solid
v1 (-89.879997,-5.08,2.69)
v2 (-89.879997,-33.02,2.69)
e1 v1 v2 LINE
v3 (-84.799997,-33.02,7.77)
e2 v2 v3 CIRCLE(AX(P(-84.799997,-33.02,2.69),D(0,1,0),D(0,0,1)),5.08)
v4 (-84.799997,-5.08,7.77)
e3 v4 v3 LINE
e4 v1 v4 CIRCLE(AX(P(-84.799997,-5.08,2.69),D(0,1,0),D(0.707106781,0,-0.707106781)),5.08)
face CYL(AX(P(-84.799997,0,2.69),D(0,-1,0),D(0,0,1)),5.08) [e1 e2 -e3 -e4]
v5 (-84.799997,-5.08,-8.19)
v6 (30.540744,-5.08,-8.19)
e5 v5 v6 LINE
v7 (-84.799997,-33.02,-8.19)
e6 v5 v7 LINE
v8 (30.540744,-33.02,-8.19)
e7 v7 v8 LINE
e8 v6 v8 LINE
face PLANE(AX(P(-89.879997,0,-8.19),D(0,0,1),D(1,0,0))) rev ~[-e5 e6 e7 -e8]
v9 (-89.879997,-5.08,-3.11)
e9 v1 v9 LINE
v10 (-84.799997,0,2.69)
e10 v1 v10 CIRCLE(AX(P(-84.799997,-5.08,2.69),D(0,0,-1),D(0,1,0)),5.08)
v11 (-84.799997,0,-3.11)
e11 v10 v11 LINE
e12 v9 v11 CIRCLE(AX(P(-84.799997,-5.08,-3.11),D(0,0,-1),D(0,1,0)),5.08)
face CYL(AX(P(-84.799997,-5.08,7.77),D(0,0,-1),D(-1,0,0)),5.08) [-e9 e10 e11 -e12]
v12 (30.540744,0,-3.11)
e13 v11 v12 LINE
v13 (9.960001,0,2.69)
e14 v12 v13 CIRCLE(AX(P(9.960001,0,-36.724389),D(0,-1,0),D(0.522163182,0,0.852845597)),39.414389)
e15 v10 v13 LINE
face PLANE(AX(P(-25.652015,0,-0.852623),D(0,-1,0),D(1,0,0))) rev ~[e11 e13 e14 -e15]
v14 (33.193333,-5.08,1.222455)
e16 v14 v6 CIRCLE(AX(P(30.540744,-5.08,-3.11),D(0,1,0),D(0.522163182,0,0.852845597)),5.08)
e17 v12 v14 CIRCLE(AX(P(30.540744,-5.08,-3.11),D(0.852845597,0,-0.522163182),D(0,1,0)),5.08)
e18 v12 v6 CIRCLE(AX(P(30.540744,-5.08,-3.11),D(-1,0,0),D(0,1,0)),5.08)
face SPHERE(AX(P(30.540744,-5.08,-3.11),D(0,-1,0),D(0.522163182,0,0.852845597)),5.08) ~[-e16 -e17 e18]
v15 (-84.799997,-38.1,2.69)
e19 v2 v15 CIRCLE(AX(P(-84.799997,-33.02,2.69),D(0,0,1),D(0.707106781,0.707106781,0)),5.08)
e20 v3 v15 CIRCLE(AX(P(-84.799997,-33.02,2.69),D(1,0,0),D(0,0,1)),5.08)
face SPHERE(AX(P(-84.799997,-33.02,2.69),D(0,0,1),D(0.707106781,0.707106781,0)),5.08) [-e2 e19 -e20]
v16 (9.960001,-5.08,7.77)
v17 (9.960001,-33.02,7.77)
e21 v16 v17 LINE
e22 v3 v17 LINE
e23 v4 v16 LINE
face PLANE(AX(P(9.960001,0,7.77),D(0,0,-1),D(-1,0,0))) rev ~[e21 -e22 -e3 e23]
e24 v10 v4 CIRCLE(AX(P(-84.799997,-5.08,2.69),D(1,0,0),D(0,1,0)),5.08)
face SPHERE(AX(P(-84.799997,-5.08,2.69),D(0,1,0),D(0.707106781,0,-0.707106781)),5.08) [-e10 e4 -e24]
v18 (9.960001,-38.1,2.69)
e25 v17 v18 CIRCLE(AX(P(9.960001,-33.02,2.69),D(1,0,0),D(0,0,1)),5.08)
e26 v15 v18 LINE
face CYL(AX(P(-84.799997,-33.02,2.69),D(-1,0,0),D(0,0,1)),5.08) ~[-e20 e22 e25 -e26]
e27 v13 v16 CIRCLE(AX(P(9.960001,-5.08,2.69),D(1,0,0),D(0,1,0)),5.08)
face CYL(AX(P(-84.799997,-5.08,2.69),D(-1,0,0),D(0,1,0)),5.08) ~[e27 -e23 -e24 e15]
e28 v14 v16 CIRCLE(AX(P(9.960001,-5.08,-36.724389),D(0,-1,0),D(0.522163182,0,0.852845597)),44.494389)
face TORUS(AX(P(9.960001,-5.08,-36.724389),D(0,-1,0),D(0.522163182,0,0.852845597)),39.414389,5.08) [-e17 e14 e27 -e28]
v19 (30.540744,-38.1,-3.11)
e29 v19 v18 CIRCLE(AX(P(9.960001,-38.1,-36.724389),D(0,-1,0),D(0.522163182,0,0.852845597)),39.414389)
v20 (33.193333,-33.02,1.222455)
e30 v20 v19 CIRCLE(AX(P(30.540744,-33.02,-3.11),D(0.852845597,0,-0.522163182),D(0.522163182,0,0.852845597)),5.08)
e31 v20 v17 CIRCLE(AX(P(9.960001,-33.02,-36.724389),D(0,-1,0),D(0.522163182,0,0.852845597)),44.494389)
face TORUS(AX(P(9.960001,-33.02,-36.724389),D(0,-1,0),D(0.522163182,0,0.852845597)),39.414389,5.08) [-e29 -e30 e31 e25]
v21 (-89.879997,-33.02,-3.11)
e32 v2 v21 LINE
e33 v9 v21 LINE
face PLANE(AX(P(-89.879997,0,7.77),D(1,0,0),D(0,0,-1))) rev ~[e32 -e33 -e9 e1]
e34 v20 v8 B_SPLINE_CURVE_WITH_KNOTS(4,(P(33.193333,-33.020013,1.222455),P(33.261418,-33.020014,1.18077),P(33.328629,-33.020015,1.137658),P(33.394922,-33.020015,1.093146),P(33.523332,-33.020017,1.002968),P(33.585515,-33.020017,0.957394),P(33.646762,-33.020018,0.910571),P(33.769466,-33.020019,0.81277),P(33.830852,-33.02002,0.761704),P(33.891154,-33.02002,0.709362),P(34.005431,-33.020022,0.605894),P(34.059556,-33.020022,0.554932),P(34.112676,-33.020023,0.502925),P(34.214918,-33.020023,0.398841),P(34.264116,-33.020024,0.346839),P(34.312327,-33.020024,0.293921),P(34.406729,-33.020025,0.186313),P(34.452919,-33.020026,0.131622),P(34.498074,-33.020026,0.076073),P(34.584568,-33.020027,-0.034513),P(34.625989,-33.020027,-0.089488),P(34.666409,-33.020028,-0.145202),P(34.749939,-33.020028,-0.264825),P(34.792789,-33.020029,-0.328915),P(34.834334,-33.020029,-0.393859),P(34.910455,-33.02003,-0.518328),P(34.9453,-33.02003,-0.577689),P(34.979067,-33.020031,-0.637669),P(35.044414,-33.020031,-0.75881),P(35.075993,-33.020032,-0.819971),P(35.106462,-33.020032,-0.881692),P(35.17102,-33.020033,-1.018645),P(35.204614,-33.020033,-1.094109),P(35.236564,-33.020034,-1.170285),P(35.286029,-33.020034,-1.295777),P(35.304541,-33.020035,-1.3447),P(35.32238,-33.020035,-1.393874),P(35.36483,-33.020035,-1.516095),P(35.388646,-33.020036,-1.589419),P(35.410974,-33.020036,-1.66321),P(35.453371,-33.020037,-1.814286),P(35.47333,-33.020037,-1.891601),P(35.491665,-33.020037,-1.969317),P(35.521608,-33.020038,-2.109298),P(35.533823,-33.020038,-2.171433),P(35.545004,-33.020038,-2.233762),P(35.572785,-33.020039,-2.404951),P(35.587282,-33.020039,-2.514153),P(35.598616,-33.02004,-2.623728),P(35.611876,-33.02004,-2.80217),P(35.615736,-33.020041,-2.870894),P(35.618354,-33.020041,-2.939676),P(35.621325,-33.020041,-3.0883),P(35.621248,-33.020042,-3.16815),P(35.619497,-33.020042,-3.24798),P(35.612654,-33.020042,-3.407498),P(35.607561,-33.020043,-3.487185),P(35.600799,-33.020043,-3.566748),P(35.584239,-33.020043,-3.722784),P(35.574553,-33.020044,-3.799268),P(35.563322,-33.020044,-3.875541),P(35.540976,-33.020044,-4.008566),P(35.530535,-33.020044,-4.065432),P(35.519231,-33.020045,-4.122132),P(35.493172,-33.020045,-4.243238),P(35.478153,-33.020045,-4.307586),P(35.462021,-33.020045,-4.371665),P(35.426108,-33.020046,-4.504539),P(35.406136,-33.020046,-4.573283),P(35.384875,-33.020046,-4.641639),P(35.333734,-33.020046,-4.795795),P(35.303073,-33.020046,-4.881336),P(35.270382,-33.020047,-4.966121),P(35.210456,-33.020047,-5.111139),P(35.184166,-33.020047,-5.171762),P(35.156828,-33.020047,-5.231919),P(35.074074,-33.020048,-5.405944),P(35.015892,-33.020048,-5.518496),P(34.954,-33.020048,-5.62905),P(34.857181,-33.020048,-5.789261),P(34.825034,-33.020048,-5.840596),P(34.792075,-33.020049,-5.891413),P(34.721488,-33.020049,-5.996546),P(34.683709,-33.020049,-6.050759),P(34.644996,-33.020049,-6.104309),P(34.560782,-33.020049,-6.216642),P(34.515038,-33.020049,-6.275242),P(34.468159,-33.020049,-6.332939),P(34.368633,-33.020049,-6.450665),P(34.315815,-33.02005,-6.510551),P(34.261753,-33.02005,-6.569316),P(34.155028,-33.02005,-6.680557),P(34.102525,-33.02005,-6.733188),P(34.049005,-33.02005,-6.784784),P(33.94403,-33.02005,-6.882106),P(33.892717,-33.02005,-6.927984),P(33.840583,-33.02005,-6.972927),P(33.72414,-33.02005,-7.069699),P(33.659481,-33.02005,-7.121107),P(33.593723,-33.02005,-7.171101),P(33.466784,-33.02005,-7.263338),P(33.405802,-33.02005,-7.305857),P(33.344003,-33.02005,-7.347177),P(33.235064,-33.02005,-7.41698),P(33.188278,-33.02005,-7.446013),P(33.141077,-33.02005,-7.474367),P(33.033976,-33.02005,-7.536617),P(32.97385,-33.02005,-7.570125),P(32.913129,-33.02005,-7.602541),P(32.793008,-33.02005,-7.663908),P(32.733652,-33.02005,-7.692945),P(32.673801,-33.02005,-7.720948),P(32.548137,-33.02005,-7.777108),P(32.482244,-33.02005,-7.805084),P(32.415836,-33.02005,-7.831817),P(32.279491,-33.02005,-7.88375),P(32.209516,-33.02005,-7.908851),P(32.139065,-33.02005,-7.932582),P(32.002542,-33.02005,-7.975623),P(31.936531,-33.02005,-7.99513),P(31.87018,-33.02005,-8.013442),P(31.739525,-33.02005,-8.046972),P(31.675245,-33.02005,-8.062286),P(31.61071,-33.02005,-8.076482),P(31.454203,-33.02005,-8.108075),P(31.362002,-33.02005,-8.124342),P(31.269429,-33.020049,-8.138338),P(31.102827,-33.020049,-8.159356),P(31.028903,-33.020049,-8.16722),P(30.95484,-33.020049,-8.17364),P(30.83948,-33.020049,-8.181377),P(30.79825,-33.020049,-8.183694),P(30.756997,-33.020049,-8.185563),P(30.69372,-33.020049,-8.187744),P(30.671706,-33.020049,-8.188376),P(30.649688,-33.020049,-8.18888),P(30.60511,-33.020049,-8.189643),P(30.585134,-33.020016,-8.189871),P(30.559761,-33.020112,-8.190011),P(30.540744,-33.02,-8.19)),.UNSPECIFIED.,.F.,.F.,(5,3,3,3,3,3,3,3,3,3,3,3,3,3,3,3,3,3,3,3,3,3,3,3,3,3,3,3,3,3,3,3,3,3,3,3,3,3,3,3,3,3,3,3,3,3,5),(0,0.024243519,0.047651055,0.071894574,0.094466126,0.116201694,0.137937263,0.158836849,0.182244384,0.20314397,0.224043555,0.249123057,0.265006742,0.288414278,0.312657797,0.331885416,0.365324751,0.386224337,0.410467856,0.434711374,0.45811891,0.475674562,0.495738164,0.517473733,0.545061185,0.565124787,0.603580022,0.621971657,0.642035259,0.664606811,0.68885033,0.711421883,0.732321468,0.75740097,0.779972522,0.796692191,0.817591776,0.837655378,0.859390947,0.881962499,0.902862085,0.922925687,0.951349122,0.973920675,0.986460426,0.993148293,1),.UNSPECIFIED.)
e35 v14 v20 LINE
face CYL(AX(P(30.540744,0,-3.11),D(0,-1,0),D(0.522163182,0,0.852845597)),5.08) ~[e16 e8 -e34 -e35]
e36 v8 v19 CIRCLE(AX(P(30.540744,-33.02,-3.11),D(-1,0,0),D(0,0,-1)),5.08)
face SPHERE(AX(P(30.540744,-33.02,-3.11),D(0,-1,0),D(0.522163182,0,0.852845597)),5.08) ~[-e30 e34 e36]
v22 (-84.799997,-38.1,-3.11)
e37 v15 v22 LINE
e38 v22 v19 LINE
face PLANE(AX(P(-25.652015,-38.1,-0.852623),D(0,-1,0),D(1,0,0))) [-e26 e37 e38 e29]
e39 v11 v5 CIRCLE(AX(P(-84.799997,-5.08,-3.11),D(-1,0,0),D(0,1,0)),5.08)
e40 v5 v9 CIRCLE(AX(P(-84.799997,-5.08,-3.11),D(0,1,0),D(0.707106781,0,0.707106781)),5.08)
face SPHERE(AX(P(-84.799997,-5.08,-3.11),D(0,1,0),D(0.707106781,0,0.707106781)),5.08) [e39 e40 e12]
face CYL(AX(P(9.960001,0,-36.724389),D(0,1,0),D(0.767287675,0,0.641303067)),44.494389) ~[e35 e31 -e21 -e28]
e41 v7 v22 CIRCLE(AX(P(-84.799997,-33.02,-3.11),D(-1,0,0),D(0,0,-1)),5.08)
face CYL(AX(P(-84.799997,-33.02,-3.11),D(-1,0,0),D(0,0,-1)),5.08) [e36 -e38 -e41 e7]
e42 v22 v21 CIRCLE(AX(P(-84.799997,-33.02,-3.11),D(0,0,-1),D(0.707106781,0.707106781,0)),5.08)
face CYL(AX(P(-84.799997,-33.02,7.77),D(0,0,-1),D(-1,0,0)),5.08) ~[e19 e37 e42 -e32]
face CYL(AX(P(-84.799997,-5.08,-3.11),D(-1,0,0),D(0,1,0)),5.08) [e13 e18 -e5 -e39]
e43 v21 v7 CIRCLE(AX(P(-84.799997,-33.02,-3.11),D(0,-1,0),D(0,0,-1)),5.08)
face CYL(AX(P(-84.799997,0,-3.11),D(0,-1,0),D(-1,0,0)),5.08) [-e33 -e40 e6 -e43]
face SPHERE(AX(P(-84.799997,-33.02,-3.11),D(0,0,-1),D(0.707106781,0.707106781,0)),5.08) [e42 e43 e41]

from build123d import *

# Parameters (mm, degrees)
F1_DEPTH     = 38.1
F2_R         = 5.08
F3_F1_R      = 5.08
F3_T2_DEPTH  = 94.7599984092
F3_T4_DEPTH  = 115.3407412507
F3_S8_W      = 5.1816
F3_S8_H      = 5.1816
F3_T9_DEPTH  = 5.1816
F3_S14_W     = 5.1816
F3_S14_H     = 5.1816
F3_T15_DEPTH = 5.1816
F3_T19_ANGLE = 31.4774656297
F3_T21_ANGLE = 148.5225343703
F3_T22_DEPTH = 94.7599984092
F3_T24_DEPTH = 115.3407412507
F3_S28_W     = 5.1816
F3_S28_H     = 5.1816
F3_T29_DEPTH = 5.1816
F3_S34_W     = 5.1816
F3_S34_H     = 5.1816
F3_T35_DEPTH = 5.1816
F3_T39_ANGLE = 31.4774656297
F3_T41_ANGLE = 148.5225343703


# Not quite as in the source:
# - a fillet or chamfer that OpenCascade refuses, or shapes differently, is made with other operations: its cross-section is extruded or revolved along the edge and cut away or added


with BuildPart() as f1:
    # F0 (on Front) → F1 (new body)
    with BuildSketch(Plane.XZ):
        with BuildLine():
            Line((9.9600013345, 7.7700004913), (-89.8799970746, 7.7700004913))
            Line((-89.8799970746, 7.7700004913), (-89.8799970746, -8.1900004297))
            Line((-89.8799970746, -8.1900004297), (44.0999977291, -8.1900004297))
            ThreePointArc((44.0999977291, -8.1900004297), (28.8031763803, 3.5829980082), (9.9600013345, 7.7700004913))
        make_face()
    extrude(amount=F1_DEPTH)

    # F2
    f2_edges = [f1.edges().sort_by_distance(p)[0] for p in [
        (-89.879997, -19.05, -8.19),
        (-89.879997, 0, -0.21),
        (-89.879997, -19.05, 7.77),
        (-89.879997, -38.1, -0.21),
    ]]
    fillet(f2_edges, radius=F2_R)

    # F3: fillet of radius 5.08 on 12 edges, made by hand

    # F3_f1
    f3_f1_edges = [f1.edges().sort_by_distance(p)[0] for p in [
        (44.0999977291, -19.05, -8.1900004297),
    ]]
    fillet(f3_f1_edges, radius=F3_F1_R)

    # F3_s3 → F3_t2 (cut)
    with BuildSketch(Plane.YZ.offset(-84.7999970746)):
        with BuildLine():
            ThreePointArc((0, 2.6900004913), (-1.4878975516, 6.2821029397), (-5.08, 7.7700004913))
            Line((-5.08, 7.7700004913), (-5.08, 7.8716004913))
            Line((-5.08, 7.8716004913), (0.1016, 7.8716004913))
            Line((0.1016, 7.8716004913), (0.1016, 2.6900004913))
            Line((0.1016, 2.6900004913), (0, 2.6900004913))
        make_face()
    extrude(amount=F3_T2_DEPTH, mode=Mode.SUBTRACT)

    # F3_s5 → F3_t4 (cut)
    with BuildSketch(Plane.YZ.offset(-84.7999970746)):
        with BuildLine():
            ThreePointArc((0, -3.1100004297), (-1.4878975516, -6.7021028782), (-5.08, -8.1900004297))
            Line((-5.08, -8.1900004297), (-5.08, -8.2916004297))
            Line((-5.08, -8.2916004297), (0.1016, -8.2916004297))
            Line((0.1016, -8.2916004297), (0.1016, -3.1100004297))
            Line((0.1016, -3.1100004297), (0, -3.1100004297))
        make_face()
    extrude(amount=F3_T4_DEPTH, mode=Mode.SUBTRACT)


with BuildPart() as f3_tool7:
    # F3_s8 → F3_t9 (new body)
    with BuildSketch(Plane.XZ.offset(5.08)):
        with Locations((-87.3907970746, 5.2808004913)):
            Rectangle(F3_S8_W, F3_S8_H)
    extrude(amount=-F3_T9_DEPTH)

    # F3_s10 → F3_t11 (revolve, cut)
    with BuildSketch(Plane(origin=(-84.7999970746, -5.08, 2.6900004913), x_dir=(0.7071067812, 0, -0.7071067812), z_dir=(0.7071067812, 0, 0.7071067812))):
        with BuildLine():
            ThreePointArc((0, -5.08), (5.08, 0), (0, 5.08))
            Line((0, 5.08), (0, -5.08))
        make_face()
    revolve(axis=Axis((-84.7999970746, -5.08, 2.6900004913), (0, 1, 0)), mode=Mode.SUBTRACT)


with BuildPart() as f1_1:
    add(f1.part)

    # F3_t6: cut F3_tool7
    add(f3_tool7.part, mode=Mode.SUBTRACT)


with BuildPart() as f3_tool13:
    # F3_s14 → F3_t15 (new body)
    with BuildSketch(Plane.XZ.offset(5.08)):
        with Locations((-87.3907970746, -5.7008004297)):
            Rectangle(F3_S14_W, F3_S14_H)
    extrude(amount=-F3_T15_DEPTH)

    # F3_s16 → F3_t17 (revolve, cut)
    with BuildSketch(Plane(origin=(-84.7999970746, -5.08, -3.1100004297), x_dir=(0.7071067812, 0, 0.7071067812), z_dir=(-0.7071067812, 0, 0.7071067812))):
        with BuildLine():
            ThreePointArc((0, -5.08), (5.08, 0), (0, 5.08))
            Line((0, 5.08), (0, -5.08))
        make_face()
    revolve(axis=Axis((-84.7999970746, -5.08, -3.1100004297), (0, 1, 0)), mode=Mode.SUBTRACT)


with BuildPart() as f1_2:
    add(f1_1.part)

    # F3_t12: cut F3_tool13
    add(f3_tool13.part, mode=Mode.SUBTRACT)

    # F3_s18 → F3_t19 (revolve, cut)
    with BuildSketch(Plane(origin=(23.5986358548, 0, -14.4484990421), x_dir=(0, 1, 0), z_dir=(0.8528455965, 0, -0.5221631818))):
        with BuildLine():
            ThreePointArc((0, 13.2949019826), (-1.4878975516, 16.887004431), (-5.08, 18.3749019826))
            Line((-5.08, 18.3749019826), (-5.08, 18.4765019826))
            Line((-5.08, 18.4765019826), (0.1016, 18.4765019826))
            Line((0.1016, 18.4765019826), (0.1016, 13.2949019826))
            Line((0.1016, 13.2949019826), (0, 13.2949019826))
        make_face()
    revolve(axis=Axis((9.9600013345, 0, -36.7243886458), (0, -1, 0)), revolution_arc=F3_T19_ANGLE, mode=Mode.SUBTRACT)

    # F3_s20 → F3_t21 (revolve, cut)
    with BuildSketch(Plane(origin=(23.5986358548, 0, -14.4484990421), x_dir=(0, 1, 0), z_dir=(-0.8528455965, 0, 0.5221631818))):
        with BuildLine():
            ThreePointArc((0, -13.2949019826), (-1.4878975516, -16.887004431), (-5.08, -18.3749019826))
            Line((-5.08, -18.3749019826), (-5.08, -18.4765019826))
            Line((-5.08, -18.4765019826), (0.1016, -18.4765019826))
            Line((0.1016, -18.4765019826), (0.1016, -13.2949019826))
            Line((0.1016, -13.2949019826), (0, -13.2949019826))
        make_face()
    revolve(axis=Axis((30.5407441761, 0, -3.1100004297), (0, 1, 0)), revolution_arc=F3_T21_ANGLE, mode=Mode.SUBTRACT)

    # F3_s23 → F3_t22 (cut)
    with BuildSketch(Plane.YZ.offset(-84.7999970746)):
        with BuildLine():
            ThreePointArc((-33.02, 7.7700004913), (-36.6121024484, 6.2821029397), (-38.1, 2.6900004913))
            Line((-38.1, 2.6900004913), (-38.2016, 2.6900004913))
            Line((-38.2016, 2.6900004913), (-38.2016, 7.8716004913))
            Line((-38.2016, 7.8716004913), (-33.02, 7.8716004913))
            Line((-33.02, 7.8716004913), (-33.02, 7.7700004913))
        make_face()
    extrude(amount=F3_T22_DEPTH, mode=Mode.SUBTRACT)

    # F3_s25 → F3_t24 (cut)
    with BuildSketch(Plane.YZ.offset(-84.7999970746)):
        with BuildLine():
            ThreePointArc((-33.02, -8.1900004297), (-36.6121024484, -6.7021028782), (-38.1, -3.1100004297))
            Line((-38.1, -3.1100004297), (-38.2016, -3.1100004297))
            Line((-38.2016, -3.1100004297), (-38.2016, -8.2916004297))
            Line((-38.2016, -8.2916004297), (-33.02, -8.2916004297))
            Line((-33.02, -8.2916004297), (-33.02, -8.1900004297))
        make_face()
    extrude(amount=F3_T24_DEPTH, mode=Mode.SUBTRACT)


with BuildPart() as f3_tool27:
    # F3_s28 → F3_t29 (new body)
    with BuildSketch(Plane.XY.offset(2.6900004913)):
        with Locations((-87.3907970746, -35.6108)):
            Rectangle(F3_S28_W, F3_S28_H)
    extrude(amount=F3_T29_DEPTH)

    # F3_s30 → F3_t31 (revolve, cut)
    with BuildSketch(Plane(origin=(-84.7999970746, -33.02, 2.6900004913), x_dir=(0.7071067812, 0.7071067812, 0), z_dir=(0.7071067812, -0.7071067812, 0))):
        with BuildLine():
            ThreePointArc((0, -5.08), (5.08, 0), (0, 5.08))
            Line((0, 5.08), (0, -5.08))
        make_face()
    revolve(axis=Axis((-84.7999970746, -33.02, 2.6900004913), (0, 0, 1)), mode=Mode.SUBTRACT)


with BuildPart() as f1_3:
    add(f1_2.part)

    # F3_t26: cut F3_tool27
    add(f3_tool27.part, mode=Mode.SUBTRACT)


with BuildPart() as f3_tool33:
    # F3_s34 → F3_t35 (new body)
    with BuildSketch(Plane.XY.offset(-3.1100004297)):
        with Locations((-87.3907970746, -35.6108)):
            Rectangle(F3_S34_W, F3_S34_H)
    extrude(amount=-F3_T35_DEPTH)

    # F3_s36 → F3_t37 (revolve, cut)
    with BuildSketch(Plane(origin=(-84.7999970746, -33.02, -3.1100004297), x_dir=(0.7071067812, 0.7071067812, 0), z_dir=(-0.7071067812, 0.7071067812, 0))):
        with BuildLine():
            ThreePointArc((0, -5.08), (5.08, 0), (0, 5.08))
            Line((0, 5.08), (0, -5.08))
        make_face()
    revolve(axis=Axis((-84.7999970746, -33.02, -3.1100004297), (0, 0, -1)), mode=Mode.SUBTRACT)


with BuildPart() as f1_4:
    add(f1_3.part)

    # F3_t32: cut F3_tool33
    add(f3_tool33.part, mode=Mode.SUBTRACT)

    # F3_s38 → F3_t39 (revolve, cut)
    with BuildSketch(Plane(origin=(23.5986358548, 0, -14.4484990421), x_dir=(0, 1, 0), z_dir=(0.8528455965, 0, -0.5221631818))):
        with BuildLine():
            ThreePointArc((-33.02, 18.3749019826), (-36.6121024484, 16.887004431), (-38.1, 13.2949019826))
            Line((-38.1, 13.2949019826), (-38.2016, 13.2949019826))
            Line((-38.2016, 13.2949019826), (-38.2016, 18.4765019826))
            Line((-38.2016, 18.4765019826), (-33.02, 18.4765019826))
            Line((-33.02, 18.4765019826), (-33.02, 18.3749019826))
        make_face()
    revolve(axis=Axis((9.9600013345, -38.1, -36.7243886458), (0, -1, 0)), revolution_arc=F3_T39_ANGLE, mode=Mode.SUBTRACT)

    # F3_s40 → F3_t41 (revolve, cut)
    with BuildSketch(Plane(origin=(23.5986358548, 0, -14.4484990421), x_dir=(0, 1, 0), z_dir=(-0.8528455965, 0, 0.5221631818))):
        with BuildLine():
            ThreePointArc((-33.02, -18.3749019826), (-36.6121024484, -16.887004431), (-38.1, -13.2949019826))
            Line((-38.1, -13.2949019826), (-38.2016, -13.2949019826))
            Line((-38.2016, -13.2949019826), (-38.2016, -18.4765019826))
            Line((-38.2016, -18.4765019826), (-33.02, -18.4765019826))
            Line((-33.02, -18.4765019826), (-33.02, -18.3749019826))
        make_face()
    revolve(axis=Axis((30.5407441761, -38.1, -3.1100004297), (0, 1, 0)), revolution_arc=F3_T41_ANGLE, mode=Mode.SUBTRACT)


solid = f1_4.part
